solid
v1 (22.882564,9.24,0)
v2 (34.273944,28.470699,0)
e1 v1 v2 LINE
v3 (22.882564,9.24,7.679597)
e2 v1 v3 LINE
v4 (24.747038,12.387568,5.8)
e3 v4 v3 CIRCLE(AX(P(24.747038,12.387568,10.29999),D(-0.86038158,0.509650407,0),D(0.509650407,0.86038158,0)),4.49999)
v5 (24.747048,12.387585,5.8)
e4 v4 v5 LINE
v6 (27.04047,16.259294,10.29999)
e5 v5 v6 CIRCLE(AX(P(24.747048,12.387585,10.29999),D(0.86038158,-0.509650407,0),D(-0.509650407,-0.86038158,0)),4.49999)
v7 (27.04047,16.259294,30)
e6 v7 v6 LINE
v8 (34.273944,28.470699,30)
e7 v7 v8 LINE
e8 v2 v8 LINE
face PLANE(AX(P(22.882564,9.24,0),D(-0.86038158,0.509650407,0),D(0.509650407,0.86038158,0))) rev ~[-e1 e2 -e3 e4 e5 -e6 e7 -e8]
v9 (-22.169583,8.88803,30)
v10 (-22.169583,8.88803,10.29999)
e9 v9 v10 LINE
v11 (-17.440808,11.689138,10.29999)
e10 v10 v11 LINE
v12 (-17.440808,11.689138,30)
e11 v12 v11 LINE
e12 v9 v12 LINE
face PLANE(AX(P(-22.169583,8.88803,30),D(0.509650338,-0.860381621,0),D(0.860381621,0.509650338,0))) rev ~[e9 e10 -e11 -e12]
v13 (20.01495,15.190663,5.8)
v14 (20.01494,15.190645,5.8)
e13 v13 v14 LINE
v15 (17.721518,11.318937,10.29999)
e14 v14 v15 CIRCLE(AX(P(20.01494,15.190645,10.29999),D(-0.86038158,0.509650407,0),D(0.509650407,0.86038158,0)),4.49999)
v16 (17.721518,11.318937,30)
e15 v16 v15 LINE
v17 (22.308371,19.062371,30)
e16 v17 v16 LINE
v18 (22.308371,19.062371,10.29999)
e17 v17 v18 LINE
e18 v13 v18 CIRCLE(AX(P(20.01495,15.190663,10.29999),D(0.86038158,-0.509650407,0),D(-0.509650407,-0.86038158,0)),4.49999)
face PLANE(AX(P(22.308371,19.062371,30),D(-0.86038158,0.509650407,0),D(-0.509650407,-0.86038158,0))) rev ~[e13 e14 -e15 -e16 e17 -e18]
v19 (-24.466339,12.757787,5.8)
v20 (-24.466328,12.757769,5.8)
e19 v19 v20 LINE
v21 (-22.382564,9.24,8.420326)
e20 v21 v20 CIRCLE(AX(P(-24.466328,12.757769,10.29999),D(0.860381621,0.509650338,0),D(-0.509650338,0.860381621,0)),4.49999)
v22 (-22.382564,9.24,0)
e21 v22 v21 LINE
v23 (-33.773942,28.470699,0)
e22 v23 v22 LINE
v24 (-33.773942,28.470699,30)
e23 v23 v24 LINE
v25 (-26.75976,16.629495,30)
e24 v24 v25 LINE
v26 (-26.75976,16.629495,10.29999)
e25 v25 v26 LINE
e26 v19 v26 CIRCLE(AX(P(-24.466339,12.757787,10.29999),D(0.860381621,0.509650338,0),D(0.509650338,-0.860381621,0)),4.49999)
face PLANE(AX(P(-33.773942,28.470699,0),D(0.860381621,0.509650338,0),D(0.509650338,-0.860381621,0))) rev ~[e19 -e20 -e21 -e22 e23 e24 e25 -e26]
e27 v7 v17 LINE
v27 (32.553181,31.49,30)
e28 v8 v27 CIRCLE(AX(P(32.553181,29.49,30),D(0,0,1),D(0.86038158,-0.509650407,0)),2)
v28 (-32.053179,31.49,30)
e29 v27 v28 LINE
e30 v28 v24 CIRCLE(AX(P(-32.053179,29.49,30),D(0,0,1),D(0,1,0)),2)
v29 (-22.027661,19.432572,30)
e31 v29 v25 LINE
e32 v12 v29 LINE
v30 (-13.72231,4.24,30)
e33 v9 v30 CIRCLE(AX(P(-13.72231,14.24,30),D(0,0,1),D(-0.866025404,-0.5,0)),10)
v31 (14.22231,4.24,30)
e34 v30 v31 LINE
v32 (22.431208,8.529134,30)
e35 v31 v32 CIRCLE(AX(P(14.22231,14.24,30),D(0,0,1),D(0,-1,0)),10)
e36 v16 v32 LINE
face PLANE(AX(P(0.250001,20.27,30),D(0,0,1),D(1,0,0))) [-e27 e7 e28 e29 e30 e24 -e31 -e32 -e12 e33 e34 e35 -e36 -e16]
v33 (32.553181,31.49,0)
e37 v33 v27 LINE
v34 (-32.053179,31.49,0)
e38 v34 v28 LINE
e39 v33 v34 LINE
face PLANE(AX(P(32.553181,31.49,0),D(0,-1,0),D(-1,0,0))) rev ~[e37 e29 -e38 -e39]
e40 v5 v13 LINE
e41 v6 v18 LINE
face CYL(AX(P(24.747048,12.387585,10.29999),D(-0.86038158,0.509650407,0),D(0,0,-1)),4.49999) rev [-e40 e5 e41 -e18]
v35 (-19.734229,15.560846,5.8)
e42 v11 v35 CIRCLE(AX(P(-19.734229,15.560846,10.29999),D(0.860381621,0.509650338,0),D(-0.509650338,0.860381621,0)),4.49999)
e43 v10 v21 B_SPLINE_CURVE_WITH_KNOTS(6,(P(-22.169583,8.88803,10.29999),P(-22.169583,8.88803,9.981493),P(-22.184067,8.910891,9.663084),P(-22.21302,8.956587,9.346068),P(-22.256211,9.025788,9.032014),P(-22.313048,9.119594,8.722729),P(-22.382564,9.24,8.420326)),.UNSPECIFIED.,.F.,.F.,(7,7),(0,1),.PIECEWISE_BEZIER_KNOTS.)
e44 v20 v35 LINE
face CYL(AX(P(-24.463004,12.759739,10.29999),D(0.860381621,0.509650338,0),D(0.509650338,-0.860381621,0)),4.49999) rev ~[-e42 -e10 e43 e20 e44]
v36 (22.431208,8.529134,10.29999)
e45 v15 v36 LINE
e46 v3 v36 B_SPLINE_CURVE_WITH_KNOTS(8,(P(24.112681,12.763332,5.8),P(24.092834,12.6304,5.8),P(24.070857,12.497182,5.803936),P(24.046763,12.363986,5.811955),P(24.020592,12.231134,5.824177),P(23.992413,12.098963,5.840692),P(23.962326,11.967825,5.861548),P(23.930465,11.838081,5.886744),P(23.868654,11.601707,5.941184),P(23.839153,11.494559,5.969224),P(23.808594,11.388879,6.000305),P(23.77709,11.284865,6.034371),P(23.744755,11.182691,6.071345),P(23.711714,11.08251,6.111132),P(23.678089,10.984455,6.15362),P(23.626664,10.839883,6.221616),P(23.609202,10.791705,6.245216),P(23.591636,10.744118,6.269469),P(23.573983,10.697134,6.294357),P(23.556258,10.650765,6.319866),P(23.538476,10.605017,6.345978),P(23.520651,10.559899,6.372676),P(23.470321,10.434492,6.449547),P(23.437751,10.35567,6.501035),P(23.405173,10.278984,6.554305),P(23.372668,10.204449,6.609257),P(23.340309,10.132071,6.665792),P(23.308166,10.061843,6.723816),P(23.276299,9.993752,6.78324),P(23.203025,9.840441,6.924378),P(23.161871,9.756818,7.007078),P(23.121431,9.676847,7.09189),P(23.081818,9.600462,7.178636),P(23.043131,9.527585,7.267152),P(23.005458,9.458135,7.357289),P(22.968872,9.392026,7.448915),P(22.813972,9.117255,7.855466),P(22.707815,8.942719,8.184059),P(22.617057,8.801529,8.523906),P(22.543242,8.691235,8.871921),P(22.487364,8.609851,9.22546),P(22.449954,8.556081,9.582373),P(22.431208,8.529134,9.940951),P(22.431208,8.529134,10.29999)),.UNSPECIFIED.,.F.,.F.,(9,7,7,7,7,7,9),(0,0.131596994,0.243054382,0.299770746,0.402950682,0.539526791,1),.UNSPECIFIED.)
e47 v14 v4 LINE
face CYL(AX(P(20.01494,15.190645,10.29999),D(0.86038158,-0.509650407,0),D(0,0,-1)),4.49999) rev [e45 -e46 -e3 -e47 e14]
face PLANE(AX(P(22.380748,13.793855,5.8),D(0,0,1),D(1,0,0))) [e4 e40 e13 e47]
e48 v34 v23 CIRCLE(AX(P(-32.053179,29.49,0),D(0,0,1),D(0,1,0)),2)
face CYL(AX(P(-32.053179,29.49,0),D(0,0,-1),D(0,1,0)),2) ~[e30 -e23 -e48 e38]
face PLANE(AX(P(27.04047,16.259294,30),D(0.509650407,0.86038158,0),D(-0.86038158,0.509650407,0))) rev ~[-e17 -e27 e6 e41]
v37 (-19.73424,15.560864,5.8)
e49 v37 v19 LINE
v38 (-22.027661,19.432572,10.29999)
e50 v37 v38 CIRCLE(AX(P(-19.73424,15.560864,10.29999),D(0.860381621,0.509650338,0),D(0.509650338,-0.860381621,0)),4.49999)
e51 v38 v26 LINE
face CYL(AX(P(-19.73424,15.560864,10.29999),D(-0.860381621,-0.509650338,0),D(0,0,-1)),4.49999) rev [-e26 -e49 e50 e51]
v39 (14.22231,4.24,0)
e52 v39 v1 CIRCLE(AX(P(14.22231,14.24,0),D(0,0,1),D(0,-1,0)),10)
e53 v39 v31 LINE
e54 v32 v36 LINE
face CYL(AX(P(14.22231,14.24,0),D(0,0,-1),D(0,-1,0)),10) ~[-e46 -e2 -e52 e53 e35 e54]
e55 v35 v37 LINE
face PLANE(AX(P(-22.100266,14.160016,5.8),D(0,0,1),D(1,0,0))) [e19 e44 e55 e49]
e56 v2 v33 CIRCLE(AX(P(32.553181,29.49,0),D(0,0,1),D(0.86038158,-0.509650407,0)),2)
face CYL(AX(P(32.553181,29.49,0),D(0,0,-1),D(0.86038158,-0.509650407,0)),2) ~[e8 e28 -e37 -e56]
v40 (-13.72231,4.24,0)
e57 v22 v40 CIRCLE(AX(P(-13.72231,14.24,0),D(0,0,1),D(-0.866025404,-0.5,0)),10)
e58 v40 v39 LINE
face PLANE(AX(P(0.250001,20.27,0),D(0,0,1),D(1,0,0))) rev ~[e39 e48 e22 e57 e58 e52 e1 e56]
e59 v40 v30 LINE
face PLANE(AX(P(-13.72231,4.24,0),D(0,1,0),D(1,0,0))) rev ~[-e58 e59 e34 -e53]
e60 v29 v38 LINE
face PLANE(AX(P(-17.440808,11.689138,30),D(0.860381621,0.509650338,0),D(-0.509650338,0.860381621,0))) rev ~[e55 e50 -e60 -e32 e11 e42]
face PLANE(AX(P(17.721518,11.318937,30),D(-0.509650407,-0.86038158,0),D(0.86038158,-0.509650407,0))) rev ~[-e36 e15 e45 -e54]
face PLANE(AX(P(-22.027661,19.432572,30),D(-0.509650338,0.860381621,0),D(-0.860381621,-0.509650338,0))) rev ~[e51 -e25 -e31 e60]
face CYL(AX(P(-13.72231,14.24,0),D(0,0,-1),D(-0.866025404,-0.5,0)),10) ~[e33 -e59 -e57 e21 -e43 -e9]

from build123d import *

# Parameters (mm, degrees)
F1_DEPTH = 30
F3_DEPTH = 24.2
F4_R     = 4.49999


# Not quite as in the source:
# - a fillet or chamfer is up to 0.001 mm smaller than in the source, because OpenCascade refuses the exact size


with BuildPart() as f1:
    # F0 (on Top) → F1 (new body)
    with BuildSketch(Plane.XY):
        with BuildLine():
            Line((-13.7223101757, 4.24), (14.2223098243, 4.24))
            ThreePointArc((14.2223098243, 4.24), (19.2223098243, 5.5797459622), (22.8825638622, 9.24))
            Line((22.8825638622, 9.24), (34.2739440306, 28.4706991862))
            ThreePointArc((34.2739440306, 28.4706991862), (34.2907944109, 30.4803025731), (32.5531808711, 31.49))
            Line((32.5531808711, 31.49), (-32.0531791289, 31.49))
            ThreePointArc((-32.0531791289, 31.49), (-33.7907926288, 30.4803026431), (-33.7739423706, 28.4706993249))
            Line((-33.7739423706, 28.4706993249), (-22.3825642135, 9.24))
            ThreePointArc((-22.3825642135, 9.24), (-18.7223101757, 5.5797459622), (-13.7223101757, 4.24))
        make_face()
    extrude(amount=F1_DEPTH)

    # F2 (on face) → F3 (cut)
    with BuildSketch(Plane.XY.offset(30)):
        with BuildLine():
            Line((-26.759759987, 16.6294953398), (-22.3825642135, 9.24))
            ThreePointArc((-22.3825642135, 9.24), (-22.2778836833, 9.0629195529), (-22.1695828196, 8.8880298132))
            Line((-22.1695828196, 8.8880298132), (-17.4408080346, 11.6891376089))
            Line((-17.4408080346, 11.6891376089), (-22.0276610725, 19.4325721963))
            Line((-22.0276610725, 19.4325721963), (-26.759759987, 16.6294953398))
        make_face()
        with BuildLine():
            Line((17.7215177836, 11.3189368702), (22.4312077057, 8.5291335532))
            ThreePointArc((22.4312077057, 8.5291335532), (22.6643714442, 8.879813846), (22.8825638622, 9.24))
            Line((22.8825638622, 9.24), (27.0404701341, 16.2592938501))
            Line((27.0404701341, 16.2592938501), (22.3083714455, 19.0623710879))
            Line((22.3083714455, 19.0623710879), (17.7215177836, 11.3189368702))
        make_face()
    extrude(amount=-F3_DEPTH, mode=Mode.SUBTRACT)

    # F4 (radius 4.5 in the source; OpenCascade refuses exactly that, so slightly less here)
    f4_edges = [f1.edges().sort_by_distance(p)[0] for p in [
        (-24.393711, 18.031034, 5.8),
        (-19.805195, 10.288584, 5.8),
        (24.674421, 17.660832, 5.8),
        (20.076363, 9.924035, 5.8),
    ]]
    fillet(f4_edges, radius=F4_R)


solid = f1.part
